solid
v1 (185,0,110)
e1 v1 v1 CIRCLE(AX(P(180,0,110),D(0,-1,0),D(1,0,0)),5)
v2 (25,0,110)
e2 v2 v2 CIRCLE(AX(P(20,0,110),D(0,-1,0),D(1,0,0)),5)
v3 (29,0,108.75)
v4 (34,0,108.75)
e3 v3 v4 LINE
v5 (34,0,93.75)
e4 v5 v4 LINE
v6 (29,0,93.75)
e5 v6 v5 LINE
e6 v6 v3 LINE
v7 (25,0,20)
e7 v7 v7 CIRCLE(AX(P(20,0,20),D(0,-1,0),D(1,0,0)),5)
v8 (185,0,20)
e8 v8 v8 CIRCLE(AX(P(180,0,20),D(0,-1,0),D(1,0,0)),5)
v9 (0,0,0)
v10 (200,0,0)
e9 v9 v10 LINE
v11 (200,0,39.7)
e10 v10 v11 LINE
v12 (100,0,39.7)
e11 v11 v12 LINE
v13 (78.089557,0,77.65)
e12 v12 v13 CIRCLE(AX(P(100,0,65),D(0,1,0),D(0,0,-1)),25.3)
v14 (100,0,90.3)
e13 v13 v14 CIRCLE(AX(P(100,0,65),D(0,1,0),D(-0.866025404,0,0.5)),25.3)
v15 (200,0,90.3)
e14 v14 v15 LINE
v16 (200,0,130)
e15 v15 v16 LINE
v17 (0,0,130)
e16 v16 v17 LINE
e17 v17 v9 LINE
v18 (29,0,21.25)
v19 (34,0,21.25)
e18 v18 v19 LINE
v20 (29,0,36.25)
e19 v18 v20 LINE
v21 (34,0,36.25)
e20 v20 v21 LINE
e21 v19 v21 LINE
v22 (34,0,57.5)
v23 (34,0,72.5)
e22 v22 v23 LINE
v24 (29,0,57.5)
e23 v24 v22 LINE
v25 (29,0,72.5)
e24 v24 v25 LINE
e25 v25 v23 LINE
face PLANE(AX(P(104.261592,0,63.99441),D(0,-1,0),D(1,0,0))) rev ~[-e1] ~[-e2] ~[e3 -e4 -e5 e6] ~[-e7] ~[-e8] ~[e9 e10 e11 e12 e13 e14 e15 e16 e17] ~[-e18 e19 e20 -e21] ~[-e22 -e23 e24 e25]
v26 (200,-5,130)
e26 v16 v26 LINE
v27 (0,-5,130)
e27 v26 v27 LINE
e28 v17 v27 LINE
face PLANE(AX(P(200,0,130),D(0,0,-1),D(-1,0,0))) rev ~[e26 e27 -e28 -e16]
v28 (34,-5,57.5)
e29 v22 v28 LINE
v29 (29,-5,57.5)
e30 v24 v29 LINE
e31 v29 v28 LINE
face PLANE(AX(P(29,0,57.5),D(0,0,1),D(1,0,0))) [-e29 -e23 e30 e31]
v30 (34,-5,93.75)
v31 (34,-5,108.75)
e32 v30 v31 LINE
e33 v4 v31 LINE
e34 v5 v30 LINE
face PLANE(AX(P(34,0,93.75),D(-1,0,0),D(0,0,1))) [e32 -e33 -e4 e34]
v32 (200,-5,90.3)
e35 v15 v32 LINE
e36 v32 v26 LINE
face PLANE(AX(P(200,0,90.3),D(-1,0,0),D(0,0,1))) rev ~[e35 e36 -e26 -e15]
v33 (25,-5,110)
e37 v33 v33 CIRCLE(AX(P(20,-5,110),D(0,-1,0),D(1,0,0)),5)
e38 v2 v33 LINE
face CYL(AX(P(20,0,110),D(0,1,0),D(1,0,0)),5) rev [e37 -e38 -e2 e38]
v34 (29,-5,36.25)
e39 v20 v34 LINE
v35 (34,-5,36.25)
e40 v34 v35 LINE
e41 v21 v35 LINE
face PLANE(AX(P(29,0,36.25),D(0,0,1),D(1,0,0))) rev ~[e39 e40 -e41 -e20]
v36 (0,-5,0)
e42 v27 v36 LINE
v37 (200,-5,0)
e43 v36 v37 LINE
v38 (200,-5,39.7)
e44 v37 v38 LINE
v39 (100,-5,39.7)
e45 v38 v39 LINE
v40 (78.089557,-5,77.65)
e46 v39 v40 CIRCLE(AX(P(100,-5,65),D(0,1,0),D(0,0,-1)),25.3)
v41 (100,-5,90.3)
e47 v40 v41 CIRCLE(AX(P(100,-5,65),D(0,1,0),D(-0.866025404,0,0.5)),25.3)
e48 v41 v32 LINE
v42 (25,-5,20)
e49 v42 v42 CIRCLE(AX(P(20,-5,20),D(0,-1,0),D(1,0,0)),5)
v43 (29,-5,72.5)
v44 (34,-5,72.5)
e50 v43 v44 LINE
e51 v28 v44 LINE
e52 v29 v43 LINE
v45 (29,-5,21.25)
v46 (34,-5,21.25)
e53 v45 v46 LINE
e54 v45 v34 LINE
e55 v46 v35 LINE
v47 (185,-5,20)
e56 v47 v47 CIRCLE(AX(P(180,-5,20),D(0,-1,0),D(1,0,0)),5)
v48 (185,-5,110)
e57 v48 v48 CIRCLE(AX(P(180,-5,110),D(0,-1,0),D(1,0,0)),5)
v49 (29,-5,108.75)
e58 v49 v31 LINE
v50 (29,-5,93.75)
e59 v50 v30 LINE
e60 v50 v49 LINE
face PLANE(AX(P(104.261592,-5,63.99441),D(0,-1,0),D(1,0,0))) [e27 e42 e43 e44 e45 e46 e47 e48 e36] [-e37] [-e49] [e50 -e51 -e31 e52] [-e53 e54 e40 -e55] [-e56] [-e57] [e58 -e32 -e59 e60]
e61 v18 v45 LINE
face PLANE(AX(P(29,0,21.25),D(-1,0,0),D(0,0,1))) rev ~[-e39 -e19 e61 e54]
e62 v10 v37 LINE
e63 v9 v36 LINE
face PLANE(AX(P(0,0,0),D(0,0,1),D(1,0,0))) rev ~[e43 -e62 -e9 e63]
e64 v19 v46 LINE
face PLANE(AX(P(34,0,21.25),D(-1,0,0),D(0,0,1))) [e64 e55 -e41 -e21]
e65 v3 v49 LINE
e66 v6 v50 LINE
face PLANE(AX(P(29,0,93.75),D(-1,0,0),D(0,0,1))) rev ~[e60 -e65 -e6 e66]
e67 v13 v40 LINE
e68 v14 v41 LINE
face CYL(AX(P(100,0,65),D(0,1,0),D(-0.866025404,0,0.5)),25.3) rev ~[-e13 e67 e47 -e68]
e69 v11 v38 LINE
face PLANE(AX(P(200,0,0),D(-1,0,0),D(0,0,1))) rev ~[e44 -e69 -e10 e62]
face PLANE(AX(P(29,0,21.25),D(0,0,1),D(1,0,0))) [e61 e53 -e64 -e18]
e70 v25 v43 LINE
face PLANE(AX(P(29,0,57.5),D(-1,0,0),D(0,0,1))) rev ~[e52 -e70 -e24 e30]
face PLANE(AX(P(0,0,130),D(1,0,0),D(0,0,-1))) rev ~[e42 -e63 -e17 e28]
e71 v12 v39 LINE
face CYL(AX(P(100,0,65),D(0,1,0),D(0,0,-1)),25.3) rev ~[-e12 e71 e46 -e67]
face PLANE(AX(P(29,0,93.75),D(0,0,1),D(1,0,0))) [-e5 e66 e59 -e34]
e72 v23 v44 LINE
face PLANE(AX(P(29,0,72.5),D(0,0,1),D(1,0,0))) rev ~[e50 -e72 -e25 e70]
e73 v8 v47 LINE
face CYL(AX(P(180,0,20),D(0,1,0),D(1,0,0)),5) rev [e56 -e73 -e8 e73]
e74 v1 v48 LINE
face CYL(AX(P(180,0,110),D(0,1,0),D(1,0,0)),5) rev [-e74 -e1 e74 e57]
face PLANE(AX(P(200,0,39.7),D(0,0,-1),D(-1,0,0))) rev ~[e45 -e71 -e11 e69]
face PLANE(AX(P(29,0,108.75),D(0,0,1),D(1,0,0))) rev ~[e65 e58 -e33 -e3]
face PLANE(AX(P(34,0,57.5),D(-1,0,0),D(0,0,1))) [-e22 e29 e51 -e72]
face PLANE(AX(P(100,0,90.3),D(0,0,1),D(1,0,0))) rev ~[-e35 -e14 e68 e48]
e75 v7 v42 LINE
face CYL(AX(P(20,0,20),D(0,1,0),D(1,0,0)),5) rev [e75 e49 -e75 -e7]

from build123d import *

# Parameters (mm, degrees)
F0_R     = 5
F0_W     = 5
F0_H     = 15
F0_W_2   = 40
F0_H_2   = 8
F1_DEPTH = 5


# Not quite as in the source:
# - a feature names something its author has since deleted; it is built from what else it names


with BuildPart() as f1:
    # F0 (on Front) → F1 (new body)
    with BuildSketch(Plane.XZ):
        with BuildLine():
            Line((0, 122), (0, 0))
            Line((0, 0), (40, 0))
            Line((40, 0), (42, 0))
            Line((42, 0), (158, 0))
            Line((158, 0), (160, 0))
            Line((160, 0), (200, 0))
            Line((200, 0), (200, 39.7))
            Line((200, 39.7), (159.7, 39.7))
            Line((159.7, 39.7), (143.1136062057, 39.7))
            ThreePointArc((143.1136062057, 39.7), (138.9711431703, 37.5), (134.8286801349, 39.7))
            Line((134.8286801349, 39.7), (100, 39.7))
            ThreePointArc((100, 39.7), (78.0895572843, 52.35), (78.0895572843, 77.65))
            ThreePointArc((78.0895572843, 77.65), (87.35, 86.9104427157), (100, 90.3))
            Line((100, 90.3), (159.7, 90.3))
            Line((159.7, 90.3), (200, 90.3))
            Line((200, 90.3), (200, 122))
            Line((200, 122), (160, 122))
            Line((160, 122), (158, 130))
            Line((158, 130), (42, 130))
            Line((42, 130), (40, 122))
            Line((40, 122), (0, 122))
        make_face()
        with Locations((20, 20)):
            Circle(F0_R, mode=Mode.SUBTRACT)
        with Locations((31.5, 28.75)):
            Rectangle(F0_W, F0_H, mode=Mode.SUBTRACT)
        with Locations((180, 20)):
            Circle(F0_R, mode=Mode.SUBTRACT)
        with Locations((31.5, 65)):
            Rectangle(F0_W, F0_H, mode=Mode.SUBTRACT)
        with BuildLine():
            ThreePointArc((66.0288568297, 87.5), (65.8584859611, 86.2059047745), (65.3589838486, 85))
            ThreePointArc((65.3589838486, 85), (56.1992276983, 88.7940952255), (66.0288568297, 87.5))
        make_face(mode=Mode.SUBTRACT)
        with Locations((20, 110)):
            Circle(F0_R, mode=Mode.SUBTRACT)
        with Locations((31.5, 101.25)):
            Rectangle(F0_W, F0_H, mode=Mode.SUBTRACT)
        with Locations((180, 110)):
            Circle(F0_R, mode=Mode.SUBTRACT)
        with BuildLine():
            ThreePointArc((66.0288568297, 87.5), (56.1992276983, 88.7940952255), (65.3589838486, 85))
            ThreePointArc((65.3589838486, 85), (65.8584859611, 86.2059047745), (66.0288568297, 87.5))
        make_face()
        with Locations((20, 126)):
            Rectangle(F0_W_2, F0_H_2)
        with Locations((180, 126)):
            Rectangle(F0_W_2, F0_H_2)
        Polygon((160, 130), (158, 130), (160, 122), align=None)
        Polygon((40, 130), (40, 122), (42, 130), align=None)
        with BuildLine():
            ThreePointArc((134.8286801349, 39.7), (138.9711431703, 37.5), (143.1136062057, 39.7))
            Line((143.1136062057, 39.7), (134.8286801349, 39.7))
        make_face()
    extrude(amount=F1_DEPTH)


solid = f1.part
